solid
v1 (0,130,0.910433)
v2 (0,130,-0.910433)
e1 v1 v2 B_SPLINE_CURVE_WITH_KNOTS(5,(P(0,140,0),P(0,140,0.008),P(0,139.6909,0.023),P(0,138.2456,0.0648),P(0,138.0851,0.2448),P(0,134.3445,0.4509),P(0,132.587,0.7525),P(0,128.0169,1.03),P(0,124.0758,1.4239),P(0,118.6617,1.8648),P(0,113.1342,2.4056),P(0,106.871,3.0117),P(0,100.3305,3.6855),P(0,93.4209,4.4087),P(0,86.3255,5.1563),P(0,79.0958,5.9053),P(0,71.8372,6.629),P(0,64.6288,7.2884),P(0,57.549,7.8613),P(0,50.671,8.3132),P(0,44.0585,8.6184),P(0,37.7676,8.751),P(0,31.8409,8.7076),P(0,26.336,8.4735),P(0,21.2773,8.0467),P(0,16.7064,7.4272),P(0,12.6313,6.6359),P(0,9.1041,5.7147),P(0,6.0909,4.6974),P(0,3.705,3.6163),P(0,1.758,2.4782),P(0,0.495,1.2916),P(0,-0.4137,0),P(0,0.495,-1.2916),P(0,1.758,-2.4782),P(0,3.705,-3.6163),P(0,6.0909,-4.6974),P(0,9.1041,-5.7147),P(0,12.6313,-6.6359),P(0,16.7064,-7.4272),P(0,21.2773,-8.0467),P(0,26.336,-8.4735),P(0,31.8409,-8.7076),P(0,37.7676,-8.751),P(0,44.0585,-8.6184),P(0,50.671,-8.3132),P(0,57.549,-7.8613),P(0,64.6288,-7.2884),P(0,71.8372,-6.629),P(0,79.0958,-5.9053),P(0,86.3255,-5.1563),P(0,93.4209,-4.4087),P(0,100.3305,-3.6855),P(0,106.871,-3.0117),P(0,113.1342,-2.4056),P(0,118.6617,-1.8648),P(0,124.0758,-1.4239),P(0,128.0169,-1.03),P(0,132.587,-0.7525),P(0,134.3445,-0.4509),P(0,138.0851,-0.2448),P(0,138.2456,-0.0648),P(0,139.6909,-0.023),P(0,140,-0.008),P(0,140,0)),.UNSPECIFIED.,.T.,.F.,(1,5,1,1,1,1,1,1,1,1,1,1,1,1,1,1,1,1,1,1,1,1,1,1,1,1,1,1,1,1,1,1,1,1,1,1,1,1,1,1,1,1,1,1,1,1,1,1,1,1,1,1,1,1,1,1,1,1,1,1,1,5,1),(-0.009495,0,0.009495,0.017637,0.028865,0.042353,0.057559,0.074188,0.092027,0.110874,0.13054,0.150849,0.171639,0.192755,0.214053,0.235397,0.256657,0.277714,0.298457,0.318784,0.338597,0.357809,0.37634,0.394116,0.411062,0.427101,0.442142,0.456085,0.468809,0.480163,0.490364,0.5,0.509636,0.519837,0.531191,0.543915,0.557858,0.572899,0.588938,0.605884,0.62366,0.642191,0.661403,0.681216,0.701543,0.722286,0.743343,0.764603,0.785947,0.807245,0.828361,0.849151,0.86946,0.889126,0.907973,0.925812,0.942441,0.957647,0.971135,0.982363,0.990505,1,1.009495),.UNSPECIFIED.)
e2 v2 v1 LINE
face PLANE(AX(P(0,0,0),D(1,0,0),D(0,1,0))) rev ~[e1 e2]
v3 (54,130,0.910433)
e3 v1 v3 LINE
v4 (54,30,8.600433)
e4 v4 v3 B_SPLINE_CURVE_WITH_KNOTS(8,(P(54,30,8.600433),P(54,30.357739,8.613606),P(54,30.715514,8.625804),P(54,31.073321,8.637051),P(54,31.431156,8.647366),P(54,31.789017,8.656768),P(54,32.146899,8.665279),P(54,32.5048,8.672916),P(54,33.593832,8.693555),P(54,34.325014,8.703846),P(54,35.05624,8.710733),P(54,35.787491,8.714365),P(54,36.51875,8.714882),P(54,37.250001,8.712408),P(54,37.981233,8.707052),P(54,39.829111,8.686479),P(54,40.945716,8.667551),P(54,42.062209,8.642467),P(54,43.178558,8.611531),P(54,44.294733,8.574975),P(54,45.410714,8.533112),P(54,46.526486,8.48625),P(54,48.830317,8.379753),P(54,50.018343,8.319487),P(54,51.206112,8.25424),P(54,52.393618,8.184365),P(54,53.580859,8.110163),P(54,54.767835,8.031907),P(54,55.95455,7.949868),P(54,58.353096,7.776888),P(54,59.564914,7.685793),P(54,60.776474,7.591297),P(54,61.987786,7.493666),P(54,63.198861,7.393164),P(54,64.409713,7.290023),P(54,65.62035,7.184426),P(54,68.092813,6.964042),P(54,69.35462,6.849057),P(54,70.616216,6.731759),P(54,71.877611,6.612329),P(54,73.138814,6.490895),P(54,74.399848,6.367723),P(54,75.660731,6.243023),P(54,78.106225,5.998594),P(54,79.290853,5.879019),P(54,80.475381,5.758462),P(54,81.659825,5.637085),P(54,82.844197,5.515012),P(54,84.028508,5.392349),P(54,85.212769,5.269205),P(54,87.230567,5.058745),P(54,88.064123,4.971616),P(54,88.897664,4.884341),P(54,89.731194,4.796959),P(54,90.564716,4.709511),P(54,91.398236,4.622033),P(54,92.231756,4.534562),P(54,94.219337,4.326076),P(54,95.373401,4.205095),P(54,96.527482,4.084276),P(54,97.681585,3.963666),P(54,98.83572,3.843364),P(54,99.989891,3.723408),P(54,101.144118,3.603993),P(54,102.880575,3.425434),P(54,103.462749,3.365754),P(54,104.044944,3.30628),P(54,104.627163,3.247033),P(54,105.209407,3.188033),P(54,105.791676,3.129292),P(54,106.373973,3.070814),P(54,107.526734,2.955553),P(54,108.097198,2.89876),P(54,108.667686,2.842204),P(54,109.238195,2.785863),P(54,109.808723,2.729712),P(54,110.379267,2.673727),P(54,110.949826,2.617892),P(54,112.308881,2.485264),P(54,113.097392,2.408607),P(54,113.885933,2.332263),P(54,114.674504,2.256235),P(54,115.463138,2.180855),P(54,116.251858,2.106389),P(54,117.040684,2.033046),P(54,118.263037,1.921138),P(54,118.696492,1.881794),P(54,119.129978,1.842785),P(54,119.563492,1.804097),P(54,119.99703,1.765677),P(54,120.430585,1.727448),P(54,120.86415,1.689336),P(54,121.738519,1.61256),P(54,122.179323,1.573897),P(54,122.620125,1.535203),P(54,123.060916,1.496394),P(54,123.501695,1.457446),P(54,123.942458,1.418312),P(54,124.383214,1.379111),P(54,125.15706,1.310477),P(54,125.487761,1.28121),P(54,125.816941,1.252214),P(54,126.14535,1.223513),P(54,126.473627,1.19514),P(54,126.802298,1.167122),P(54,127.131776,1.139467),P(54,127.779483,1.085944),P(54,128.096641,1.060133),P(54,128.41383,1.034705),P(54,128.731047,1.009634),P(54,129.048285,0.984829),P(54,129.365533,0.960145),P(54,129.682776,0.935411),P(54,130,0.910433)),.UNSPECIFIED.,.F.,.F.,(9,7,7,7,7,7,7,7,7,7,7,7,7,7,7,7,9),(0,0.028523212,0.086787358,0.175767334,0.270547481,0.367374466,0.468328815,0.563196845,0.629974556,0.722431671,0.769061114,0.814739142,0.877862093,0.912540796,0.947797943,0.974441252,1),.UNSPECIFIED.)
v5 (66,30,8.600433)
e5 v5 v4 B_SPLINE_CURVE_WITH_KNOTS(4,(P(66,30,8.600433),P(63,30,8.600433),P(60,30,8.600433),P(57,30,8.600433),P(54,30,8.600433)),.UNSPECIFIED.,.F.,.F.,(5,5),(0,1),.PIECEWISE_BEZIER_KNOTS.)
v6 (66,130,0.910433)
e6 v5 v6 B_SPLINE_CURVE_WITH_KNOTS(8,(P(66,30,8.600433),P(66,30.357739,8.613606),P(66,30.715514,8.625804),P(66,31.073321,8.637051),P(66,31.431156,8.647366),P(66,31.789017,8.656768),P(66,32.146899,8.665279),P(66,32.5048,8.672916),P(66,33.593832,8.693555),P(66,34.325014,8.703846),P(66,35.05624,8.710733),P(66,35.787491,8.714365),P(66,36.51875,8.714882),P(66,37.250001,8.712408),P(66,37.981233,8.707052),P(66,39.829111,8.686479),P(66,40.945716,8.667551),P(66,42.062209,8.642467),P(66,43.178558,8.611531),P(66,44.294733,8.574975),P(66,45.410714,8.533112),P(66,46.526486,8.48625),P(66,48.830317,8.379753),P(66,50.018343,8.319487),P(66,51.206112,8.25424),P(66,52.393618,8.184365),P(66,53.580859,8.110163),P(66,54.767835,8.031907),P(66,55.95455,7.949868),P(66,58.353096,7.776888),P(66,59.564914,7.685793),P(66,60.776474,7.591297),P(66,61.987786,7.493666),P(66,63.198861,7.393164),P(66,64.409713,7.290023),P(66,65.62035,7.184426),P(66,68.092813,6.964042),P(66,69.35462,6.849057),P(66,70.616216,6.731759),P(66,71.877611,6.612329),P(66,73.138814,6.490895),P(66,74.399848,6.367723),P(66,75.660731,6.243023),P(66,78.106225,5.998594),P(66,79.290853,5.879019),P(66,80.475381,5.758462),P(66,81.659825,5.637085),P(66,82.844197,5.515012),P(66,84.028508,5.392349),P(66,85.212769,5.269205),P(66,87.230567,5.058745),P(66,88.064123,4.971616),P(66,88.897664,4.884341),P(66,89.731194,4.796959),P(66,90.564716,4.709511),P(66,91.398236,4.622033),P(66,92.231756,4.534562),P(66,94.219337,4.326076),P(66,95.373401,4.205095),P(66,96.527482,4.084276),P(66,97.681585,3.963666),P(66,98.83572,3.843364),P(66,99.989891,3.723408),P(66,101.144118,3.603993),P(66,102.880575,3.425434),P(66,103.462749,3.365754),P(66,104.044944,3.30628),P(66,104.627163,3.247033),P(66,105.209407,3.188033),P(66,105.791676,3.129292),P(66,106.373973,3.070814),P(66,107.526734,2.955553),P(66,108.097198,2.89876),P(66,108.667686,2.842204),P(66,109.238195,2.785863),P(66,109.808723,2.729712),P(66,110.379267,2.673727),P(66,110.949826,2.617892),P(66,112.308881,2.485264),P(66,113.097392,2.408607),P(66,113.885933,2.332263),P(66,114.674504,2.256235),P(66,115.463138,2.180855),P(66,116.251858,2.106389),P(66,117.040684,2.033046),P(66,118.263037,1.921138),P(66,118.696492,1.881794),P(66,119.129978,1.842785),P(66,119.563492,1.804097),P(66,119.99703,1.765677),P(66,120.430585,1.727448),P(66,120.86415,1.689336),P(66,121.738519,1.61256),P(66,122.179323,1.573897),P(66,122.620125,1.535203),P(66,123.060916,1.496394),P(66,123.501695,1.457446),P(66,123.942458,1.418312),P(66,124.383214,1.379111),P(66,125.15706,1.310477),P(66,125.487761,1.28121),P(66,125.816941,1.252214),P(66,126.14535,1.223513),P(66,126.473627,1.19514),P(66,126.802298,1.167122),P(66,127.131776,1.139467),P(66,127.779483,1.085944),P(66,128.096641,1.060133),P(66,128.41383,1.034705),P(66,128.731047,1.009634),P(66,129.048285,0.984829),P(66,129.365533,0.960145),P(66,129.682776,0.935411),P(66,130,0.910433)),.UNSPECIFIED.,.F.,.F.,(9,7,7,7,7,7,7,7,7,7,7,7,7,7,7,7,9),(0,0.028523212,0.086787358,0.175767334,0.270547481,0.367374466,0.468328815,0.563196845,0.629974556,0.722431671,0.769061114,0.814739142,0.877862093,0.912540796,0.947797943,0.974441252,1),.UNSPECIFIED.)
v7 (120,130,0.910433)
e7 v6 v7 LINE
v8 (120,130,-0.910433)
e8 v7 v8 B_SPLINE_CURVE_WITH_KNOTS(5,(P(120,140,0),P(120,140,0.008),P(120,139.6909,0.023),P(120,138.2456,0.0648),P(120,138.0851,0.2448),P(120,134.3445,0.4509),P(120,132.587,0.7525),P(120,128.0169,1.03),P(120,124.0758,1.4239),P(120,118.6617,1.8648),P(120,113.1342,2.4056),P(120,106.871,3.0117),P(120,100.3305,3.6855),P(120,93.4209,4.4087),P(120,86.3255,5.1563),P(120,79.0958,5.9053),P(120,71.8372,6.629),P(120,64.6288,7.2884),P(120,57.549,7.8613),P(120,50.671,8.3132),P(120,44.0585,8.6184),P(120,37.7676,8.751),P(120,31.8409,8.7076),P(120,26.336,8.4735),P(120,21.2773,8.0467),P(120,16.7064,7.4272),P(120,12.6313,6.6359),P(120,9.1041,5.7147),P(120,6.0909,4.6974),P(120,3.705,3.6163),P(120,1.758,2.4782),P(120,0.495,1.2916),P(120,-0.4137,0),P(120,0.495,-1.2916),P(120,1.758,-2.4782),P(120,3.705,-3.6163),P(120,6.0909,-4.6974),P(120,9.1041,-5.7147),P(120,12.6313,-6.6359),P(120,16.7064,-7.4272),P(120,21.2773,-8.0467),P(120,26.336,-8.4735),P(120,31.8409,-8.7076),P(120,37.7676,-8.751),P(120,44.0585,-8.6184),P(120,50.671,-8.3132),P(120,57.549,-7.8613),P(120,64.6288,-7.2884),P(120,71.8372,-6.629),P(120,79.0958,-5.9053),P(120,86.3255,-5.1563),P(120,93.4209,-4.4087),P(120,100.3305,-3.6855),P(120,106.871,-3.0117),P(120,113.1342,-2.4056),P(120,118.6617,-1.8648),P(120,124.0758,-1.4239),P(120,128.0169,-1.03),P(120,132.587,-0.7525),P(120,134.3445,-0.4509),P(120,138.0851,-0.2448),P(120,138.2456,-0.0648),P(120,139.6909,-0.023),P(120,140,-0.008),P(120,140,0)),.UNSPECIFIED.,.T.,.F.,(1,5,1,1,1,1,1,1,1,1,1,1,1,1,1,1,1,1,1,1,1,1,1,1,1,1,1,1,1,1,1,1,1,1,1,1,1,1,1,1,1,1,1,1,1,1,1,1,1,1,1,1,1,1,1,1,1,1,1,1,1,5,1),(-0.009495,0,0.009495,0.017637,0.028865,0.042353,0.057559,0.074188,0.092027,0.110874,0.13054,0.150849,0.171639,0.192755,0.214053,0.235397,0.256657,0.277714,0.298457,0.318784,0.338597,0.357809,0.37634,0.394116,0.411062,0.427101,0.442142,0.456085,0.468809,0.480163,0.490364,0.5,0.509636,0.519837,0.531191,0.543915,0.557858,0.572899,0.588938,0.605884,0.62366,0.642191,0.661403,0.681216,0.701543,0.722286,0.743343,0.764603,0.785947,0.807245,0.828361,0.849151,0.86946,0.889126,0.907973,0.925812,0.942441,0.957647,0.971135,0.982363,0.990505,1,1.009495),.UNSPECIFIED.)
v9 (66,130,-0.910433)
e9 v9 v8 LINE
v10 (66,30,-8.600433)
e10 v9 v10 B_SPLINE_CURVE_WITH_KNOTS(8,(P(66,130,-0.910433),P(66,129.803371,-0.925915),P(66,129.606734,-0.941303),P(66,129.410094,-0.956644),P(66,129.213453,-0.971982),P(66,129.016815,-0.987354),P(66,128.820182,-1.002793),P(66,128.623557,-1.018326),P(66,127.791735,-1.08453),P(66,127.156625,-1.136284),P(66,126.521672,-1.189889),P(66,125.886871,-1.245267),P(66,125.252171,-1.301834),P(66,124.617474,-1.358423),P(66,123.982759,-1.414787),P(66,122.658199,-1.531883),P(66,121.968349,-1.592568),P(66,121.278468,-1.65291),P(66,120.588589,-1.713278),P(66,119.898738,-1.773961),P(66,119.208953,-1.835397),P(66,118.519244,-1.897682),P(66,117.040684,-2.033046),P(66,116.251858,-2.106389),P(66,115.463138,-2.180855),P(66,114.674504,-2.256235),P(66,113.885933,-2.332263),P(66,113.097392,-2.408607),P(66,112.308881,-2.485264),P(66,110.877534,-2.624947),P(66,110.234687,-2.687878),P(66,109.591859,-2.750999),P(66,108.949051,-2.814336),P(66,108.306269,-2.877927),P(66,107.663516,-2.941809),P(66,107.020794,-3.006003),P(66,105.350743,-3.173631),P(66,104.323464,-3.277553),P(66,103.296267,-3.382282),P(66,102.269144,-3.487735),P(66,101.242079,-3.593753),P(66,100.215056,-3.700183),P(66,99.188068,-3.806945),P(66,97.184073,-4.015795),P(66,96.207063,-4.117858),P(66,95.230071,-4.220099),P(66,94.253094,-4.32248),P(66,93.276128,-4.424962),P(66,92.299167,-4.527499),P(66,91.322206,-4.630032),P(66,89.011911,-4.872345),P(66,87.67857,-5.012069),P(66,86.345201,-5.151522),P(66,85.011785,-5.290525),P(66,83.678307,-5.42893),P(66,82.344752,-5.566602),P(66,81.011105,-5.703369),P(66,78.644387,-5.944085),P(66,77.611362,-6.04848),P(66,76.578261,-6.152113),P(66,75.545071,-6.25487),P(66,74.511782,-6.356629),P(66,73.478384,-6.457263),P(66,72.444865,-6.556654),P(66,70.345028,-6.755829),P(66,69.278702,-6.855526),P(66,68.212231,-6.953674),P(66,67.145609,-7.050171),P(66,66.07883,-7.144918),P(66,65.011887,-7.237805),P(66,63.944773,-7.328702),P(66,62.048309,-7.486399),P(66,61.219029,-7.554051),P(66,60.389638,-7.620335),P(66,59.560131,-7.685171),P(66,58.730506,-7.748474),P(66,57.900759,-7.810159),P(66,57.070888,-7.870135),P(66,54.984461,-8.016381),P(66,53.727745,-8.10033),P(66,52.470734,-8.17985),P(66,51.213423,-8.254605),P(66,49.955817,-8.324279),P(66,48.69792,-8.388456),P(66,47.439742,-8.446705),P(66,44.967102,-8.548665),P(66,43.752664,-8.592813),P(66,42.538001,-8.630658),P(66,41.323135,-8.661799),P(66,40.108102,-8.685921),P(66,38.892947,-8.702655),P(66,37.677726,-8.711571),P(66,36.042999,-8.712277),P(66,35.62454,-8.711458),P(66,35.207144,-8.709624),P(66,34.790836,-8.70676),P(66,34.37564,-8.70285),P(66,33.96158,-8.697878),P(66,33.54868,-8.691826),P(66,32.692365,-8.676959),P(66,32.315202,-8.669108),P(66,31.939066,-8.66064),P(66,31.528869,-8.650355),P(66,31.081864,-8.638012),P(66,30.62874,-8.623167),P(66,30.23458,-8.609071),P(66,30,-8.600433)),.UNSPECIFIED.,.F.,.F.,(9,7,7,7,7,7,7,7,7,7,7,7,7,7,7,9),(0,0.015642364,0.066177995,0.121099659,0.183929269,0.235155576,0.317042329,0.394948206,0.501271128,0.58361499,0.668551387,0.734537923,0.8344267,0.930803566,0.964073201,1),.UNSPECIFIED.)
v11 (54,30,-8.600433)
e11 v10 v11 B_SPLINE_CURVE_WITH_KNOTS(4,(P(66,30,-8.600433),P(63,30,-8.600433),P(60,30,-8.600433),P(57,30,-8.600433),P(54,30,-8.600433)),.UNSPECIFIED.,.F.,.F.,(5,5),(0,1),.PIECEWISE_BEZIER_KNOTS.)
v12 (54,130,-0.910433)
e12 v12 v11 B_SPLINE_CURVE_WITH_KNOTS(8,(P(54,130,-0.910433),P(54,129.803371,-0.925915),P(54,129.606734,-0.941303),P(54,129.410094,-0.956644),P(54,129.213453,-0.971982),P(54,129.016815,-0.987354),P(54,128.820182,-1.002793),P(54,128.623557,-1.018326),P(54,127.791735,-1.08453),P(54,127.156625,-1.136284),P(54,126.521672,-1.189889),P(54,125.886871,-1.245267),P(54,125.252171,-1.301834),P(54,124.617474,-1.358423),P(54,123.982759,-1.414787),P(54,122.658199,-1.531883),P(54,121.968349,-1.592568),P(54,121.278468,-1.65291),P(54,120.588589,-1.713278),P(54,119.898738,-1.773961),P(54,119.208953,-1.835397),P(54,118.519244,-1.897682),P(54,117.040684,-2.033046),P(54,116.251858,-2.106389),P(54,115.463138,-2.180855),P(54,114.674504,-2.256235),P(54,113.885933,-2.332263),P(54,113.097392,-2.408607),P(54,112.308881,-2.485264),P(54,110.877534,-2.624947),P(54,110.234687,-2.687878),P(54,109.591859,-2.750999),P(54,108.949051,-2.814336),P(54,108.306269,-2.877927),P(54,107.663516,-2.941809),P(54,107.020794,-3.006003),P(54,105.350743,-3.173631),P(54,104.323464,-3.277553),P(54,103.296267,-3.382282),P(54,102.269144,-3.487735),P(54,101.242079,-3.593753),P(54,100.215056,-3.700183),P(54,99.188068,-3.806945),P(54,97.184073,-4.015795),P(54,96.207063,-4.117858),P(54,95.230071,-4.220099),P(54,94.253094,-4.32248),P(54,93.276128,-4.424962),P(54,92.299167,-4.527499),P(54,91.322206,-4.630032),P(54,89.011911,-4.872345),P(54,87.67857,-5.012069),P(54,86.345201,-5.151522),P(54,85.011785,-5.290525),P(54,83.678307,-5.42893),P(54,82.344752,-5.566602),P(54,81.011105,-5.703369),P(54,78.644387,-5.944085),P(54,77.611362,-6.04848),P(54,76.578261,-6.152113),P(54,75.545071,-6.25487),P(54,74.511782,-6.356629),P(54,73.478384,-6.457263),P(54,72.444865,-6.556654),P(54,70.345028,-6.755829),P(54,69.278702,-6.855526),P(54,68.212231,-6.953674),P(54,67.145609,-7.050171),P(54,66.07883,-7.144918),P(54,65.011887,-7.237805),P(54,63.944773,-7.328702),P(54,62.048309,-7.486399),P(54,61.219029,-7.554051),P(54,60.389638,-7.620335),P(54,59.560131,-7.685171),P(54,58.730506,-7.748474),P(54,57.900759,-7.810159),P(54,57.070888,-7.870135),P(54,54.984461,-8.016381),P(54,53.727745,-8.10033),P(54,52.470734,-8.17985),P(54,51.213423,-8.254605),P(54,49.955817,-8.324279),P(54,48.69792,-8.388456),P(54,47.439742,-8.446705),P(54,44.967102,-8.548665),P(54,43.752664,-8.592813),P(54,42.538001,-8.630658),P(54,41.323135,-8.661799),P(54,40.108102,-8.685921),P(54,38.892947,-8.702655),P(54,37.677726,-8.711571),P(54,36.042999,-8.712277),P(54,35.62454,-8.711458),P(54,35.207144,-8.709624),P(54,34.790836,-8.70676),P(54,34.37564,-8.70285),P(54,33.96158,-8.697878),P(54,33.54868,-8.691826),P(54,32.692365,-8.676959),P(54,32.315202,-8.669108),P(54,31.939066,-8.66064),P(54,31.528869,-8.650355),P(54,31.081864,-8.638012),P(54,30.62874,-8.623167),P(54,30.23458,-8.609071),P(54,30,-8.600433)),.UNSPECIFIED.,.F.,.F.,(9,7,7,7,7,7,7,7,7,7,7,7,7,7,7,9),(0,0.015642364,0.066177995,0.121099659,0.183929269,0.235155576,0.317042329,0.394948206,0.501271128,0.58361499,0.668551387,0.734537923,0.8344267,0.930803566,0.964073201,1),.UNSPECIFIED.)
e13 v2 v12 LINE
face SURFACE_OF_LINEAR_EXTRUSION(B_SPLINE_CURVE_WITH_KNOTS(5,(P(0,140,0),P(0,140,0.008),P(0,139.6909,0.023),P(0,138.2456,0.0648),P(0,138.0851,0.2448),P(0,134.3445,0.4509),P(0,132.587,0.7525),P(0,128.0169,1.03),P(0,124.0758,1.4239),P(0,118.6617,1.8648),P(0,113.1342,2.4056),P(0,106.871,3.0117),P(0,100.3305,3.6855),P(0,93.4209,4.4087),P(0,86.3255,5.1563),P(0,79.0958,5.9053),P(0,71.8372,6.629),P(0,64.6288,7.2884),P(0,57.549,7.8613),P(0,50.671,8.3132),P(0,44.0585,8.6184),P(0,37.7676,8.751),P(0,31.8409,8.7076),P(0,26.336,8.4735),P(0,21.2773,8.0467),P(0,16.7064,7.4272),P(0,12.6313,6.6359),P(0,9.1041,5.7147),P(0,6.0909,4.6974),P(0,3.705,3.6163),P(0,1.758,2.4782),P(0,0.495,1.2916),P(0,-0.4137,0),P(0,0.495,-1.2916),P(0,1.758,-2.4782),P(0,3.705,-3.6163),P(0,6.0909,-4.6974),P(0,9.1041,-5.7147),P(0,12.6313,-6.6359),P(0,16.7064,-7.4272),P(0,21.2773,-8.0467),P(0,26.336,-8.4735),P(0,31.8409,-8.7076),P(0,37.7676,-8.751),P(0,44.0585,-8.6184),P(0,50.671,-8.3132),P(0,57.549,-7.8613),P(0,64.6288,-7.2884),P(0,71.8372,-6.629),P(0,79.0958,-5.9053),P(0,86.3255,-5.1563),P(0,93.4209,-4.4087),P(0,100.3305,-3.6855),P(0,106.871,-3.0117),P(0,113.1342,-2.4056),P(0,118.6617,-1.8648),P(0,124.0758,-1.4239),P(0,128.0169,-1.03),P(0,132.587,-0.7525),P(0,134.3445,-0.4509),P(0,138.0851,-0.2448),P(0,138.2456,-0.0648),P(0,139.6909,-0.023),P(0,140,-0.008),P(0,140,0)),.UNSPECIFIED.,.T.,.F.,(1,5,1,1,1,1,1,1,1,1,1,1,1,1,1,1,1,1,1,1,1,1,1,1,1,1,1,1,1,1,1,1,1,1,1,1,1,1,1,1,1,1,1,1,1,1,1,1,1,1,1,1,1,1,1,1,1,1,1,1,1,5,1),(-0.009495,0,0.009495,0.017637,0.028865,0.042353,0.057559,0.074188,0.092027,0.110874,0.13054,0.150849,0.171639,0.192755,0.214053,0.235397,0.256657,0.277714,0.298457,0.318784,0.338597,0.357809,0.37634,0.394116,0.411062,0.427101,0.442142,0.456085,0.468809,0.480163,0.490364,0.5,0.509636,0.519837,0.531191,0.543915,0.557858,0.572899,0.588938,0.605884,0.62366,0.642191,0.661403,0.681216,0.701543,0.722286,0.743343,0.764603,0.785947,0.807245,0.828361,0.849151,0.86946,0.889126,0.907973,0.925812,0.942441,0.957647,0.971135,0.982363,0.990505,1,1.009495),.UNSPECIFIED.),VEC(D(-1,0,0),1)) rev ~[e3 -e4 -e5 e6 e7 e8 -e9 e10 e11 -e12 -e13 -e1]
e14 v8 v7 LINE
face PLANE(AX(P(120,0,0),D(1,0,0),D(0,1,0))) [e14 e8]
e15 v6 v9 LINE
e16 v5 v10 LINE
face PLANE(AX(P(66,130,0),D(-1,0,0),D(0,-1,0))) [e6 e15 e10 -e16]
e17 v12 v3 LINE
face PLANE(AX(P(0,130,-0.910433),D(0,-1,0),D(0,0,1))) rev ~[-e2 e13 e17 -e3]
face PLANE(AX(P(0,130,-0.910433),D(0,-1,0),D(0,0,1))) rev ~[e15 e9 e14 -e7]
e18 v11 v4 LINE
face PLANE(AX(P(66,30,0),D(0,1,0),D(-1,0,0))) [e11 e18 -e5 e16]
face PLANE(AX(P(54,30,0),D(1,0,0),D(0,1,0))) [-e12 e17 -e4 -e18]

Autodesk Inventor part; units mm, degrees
ref_plane "YZ Plane" through (0, 0, 0) normal (1, 0, 0) x (0, 1, 0)
ref_plane "XZ Plane" through (0, 0, 0) normal (0, 1, 0) x (-1, 0, 0)
ref_plane "XY Plane" through (0, 0, 0) normal (0, 0, 1) x (1, 0, 0)
sketch "Sketch1" plane through (0, 0, 0) normal (1, 0, 0) x (0, 1, 0)
  spline S0 degree 5 poles (140, 0) (140, 0.008) (139.6909, 0.023) (138.2456, 0.0648) (138.0851, 0.2448) (134.3445, 0.4509) (132.587, 0.7525) (128.0169, 1.03) (124.0758, 1.4239) (118.6617, 1.8648) (113.1342, 2.4056) (106.871, 3.0117) (100.3305, 3.6855) (93.4209, 4.4087) (86.3255, 5.1563) (79.0958, 5.9053) (71.8372, 6.629) (64.6288, 7.2884) (57.549, 7.8613) (50.671, 8.3132) (44.0585, 8.6184) (37.7676, 8.751) (31.8409, 8.7076) (26.336, 8.4735) (21.2773, 8.0467) (16.7064, 7.4272) (12.6313, 6.6359) (9.1041, 5.7147) (6.0909, 4.6974) (3.705, 3.6163) (1.758, 2.4782) (0.495, 1.2916) (-0.4137, 0) (0.495, -1.2916) (1.758, -2.4782) (3.705, -3.6163) (6.0909, -4.6974) (9.1041, -5.7147) (12.6313, -6.6359) (16.7064, -7.4272) (21.2773, -8.0467) (26.336, -8.4735) (31.8409, -8.7076) (37.7676, -8.751) (44.0585, -8.6184) (50.671, -8.3132) (57.549, -7.8613) (64.6288, -7.2884) (71.8372, -6.629) (79.0958, -5.9053) (86.3255, -5.1563) (93.4209, -4.4087) (100.3305, -3.6855) (106.871, -3.0117) (113.1342, -2.4056) (118.6617, -1.8648) (124.0758, -1.4239) (128.0169, -1.03) (132.587, -0.7525) (134.3445, -0.4509) (138.0851, -0.2448) (138.2456, -0.0648) (139.6909, -0.023) (140, -0.008) (140, 0) knots 0 0 0 0 0 0 0.009495 0.017637 0.028865 0.042353 0.057559 0.074188 0.092027 0.110874 0.13054 0.150849 0.171639 0.192755 0.214053 0.235397 0.256657 0.277714 0.298457 0.318784 0.338597 0.357809 0.37634 0.394116 0.411062 0.427101 0.442142 0.456085 0.468809 0.480163 0.490364 0.5 0.509636 0.519837 0.531191 0.543915 0.557858 0.572899 0.588938 0.605884 0.62366 0.642191 0.661403 0.681216 0.701543 0.722286 0.743343 0.764603 0.785947 0.807245 0.828361 0.849151 0.86946 0.889126 0.907973 0.925812 0.942441 0.957647 0.971135 0.982363 0.990505 1 1 1 1 1 1
  line L0 (130, 16.3724) -> (164.1986, 16.3724)
  line L1 (164.1986, 16.3724) -> (164.1986, -9.4783)
  line L2 (164.1986, -9.4783) -> (130, -9.4783)
  line L3 (130, -9.4783) -> (130, 16.3724)
  point P0 (138.0834, 0.1512)
  point P1 (135.8252, 0.3794)
  point P2 (132.797, 0.6664)
  point P3 (129.0044, 0.9884)
  point P4 (124.4796, 1.3706)
  point P5 (119.294, 1.8284)
  point P6 (113.526, 2.3674)
  point P7 (107.2624, 2.982)
  point P8 (100.5956, 3.661)
  point P9 (93.6194, 4.389)
  point P10 (86.4304, 5.1422)
  point P11 (79.1224, 5.8954)
  point P12 (71.785, 6.6192)
  point P13 (64.505, 7.28)
  point P14 (57.3608, 7.8484)
  point P15 (50.4266, 8.2936)
  point P16 (43.7668, 8.5876)
  point P17 (37.4346, 8.7094)
  point P18 (31.479, 8.6478)
  point P19 (25.9504, 8.393)
  point P20 (20.881, 7.9408)
  point P21 (16.2974, 7.2954)
  point P22 (12.222, 6.4778)
  point P23 (8.6772, 5.5216)
  point P24 (5.6966, 4.4618)
  point P25 (3.3082, 3.332)
  point P26 (1.533, 2.17)
  point P27 (0.4018, 1.0262)
  point P28 (0, 0)
  point P29 (0.4018, -1.0262)
  point P30 (1.533, -2.17)
  point P31 (3.3082, -3.332)
  point P32 (5.6966, -4.4618)
  point P33 (8.6772, -5.5216)
  point P34 (12.222, -6.4778)
  point P35 (16.2974, -7.2954)
  point P36 (20.881, -7.9408)
  point P37 (25.9504, -8.393)
  point P38 (31.479, -8.6478)
  point P39 (37.4346, -8.7094)
  point P40 (43.7668, -8.5876)
  point P41 (50.4266, -8.2936)
  point P42 (57.3608, -7.8484)
  point P43 (64.505, -7.28)
  point P44 (71.785, -6.6192)
  point P45 (79.1224, -5.8954)
  point P46 (86.4304, -5.1422)
  point P47 (93.6194, -4.389)
  point P48 (100.5956, -3.661)
  point P49 (107.2624, -2.982)
  point P50 (113.526, -2.3674)
  point P51 (119.294, -1.8284)
  point P52 (124.4796, -1.3706)
  point P53 (129.0044, -0.9884)
  point P54 (132.797, -0.6664)
  point P55 (135.8252, -0.3794)
  point P56 (138.0834, -0.1512)
  point P57 (139.5086, -0.0294)
  point P58 (130, -0.9104)
  point P59 (130, 0.9104)
  dimension "d9" = 130
extrude "Extrusion1" add sketch "Sketch1" along normal blind 120 contours L3 S0 picked at (63.1596, 2.072)
sketch "Sketch3" plane through (0, 0, 0) normal (0, 0, 1) x (1, 0, 0)
  line L0 (0, 130) -> (120, 130) projected
  line L1 (54, 130) -> (66, 130)
  line L2 (66, 130) -> (66, 30)
  line L3 (66, 30) -> (54, 30)
  line L4 (54, 30) -> (54, 130)
  point P0 (0, 0)
  dimension "d11" = 12
  dimension "d12" = 100
  dimension "d17" = 54
extrude "Extrusion3" cut sketch "Sketch3" against normal through all both and the other way through all
properties part number "IISRD_Rudder_v1"
